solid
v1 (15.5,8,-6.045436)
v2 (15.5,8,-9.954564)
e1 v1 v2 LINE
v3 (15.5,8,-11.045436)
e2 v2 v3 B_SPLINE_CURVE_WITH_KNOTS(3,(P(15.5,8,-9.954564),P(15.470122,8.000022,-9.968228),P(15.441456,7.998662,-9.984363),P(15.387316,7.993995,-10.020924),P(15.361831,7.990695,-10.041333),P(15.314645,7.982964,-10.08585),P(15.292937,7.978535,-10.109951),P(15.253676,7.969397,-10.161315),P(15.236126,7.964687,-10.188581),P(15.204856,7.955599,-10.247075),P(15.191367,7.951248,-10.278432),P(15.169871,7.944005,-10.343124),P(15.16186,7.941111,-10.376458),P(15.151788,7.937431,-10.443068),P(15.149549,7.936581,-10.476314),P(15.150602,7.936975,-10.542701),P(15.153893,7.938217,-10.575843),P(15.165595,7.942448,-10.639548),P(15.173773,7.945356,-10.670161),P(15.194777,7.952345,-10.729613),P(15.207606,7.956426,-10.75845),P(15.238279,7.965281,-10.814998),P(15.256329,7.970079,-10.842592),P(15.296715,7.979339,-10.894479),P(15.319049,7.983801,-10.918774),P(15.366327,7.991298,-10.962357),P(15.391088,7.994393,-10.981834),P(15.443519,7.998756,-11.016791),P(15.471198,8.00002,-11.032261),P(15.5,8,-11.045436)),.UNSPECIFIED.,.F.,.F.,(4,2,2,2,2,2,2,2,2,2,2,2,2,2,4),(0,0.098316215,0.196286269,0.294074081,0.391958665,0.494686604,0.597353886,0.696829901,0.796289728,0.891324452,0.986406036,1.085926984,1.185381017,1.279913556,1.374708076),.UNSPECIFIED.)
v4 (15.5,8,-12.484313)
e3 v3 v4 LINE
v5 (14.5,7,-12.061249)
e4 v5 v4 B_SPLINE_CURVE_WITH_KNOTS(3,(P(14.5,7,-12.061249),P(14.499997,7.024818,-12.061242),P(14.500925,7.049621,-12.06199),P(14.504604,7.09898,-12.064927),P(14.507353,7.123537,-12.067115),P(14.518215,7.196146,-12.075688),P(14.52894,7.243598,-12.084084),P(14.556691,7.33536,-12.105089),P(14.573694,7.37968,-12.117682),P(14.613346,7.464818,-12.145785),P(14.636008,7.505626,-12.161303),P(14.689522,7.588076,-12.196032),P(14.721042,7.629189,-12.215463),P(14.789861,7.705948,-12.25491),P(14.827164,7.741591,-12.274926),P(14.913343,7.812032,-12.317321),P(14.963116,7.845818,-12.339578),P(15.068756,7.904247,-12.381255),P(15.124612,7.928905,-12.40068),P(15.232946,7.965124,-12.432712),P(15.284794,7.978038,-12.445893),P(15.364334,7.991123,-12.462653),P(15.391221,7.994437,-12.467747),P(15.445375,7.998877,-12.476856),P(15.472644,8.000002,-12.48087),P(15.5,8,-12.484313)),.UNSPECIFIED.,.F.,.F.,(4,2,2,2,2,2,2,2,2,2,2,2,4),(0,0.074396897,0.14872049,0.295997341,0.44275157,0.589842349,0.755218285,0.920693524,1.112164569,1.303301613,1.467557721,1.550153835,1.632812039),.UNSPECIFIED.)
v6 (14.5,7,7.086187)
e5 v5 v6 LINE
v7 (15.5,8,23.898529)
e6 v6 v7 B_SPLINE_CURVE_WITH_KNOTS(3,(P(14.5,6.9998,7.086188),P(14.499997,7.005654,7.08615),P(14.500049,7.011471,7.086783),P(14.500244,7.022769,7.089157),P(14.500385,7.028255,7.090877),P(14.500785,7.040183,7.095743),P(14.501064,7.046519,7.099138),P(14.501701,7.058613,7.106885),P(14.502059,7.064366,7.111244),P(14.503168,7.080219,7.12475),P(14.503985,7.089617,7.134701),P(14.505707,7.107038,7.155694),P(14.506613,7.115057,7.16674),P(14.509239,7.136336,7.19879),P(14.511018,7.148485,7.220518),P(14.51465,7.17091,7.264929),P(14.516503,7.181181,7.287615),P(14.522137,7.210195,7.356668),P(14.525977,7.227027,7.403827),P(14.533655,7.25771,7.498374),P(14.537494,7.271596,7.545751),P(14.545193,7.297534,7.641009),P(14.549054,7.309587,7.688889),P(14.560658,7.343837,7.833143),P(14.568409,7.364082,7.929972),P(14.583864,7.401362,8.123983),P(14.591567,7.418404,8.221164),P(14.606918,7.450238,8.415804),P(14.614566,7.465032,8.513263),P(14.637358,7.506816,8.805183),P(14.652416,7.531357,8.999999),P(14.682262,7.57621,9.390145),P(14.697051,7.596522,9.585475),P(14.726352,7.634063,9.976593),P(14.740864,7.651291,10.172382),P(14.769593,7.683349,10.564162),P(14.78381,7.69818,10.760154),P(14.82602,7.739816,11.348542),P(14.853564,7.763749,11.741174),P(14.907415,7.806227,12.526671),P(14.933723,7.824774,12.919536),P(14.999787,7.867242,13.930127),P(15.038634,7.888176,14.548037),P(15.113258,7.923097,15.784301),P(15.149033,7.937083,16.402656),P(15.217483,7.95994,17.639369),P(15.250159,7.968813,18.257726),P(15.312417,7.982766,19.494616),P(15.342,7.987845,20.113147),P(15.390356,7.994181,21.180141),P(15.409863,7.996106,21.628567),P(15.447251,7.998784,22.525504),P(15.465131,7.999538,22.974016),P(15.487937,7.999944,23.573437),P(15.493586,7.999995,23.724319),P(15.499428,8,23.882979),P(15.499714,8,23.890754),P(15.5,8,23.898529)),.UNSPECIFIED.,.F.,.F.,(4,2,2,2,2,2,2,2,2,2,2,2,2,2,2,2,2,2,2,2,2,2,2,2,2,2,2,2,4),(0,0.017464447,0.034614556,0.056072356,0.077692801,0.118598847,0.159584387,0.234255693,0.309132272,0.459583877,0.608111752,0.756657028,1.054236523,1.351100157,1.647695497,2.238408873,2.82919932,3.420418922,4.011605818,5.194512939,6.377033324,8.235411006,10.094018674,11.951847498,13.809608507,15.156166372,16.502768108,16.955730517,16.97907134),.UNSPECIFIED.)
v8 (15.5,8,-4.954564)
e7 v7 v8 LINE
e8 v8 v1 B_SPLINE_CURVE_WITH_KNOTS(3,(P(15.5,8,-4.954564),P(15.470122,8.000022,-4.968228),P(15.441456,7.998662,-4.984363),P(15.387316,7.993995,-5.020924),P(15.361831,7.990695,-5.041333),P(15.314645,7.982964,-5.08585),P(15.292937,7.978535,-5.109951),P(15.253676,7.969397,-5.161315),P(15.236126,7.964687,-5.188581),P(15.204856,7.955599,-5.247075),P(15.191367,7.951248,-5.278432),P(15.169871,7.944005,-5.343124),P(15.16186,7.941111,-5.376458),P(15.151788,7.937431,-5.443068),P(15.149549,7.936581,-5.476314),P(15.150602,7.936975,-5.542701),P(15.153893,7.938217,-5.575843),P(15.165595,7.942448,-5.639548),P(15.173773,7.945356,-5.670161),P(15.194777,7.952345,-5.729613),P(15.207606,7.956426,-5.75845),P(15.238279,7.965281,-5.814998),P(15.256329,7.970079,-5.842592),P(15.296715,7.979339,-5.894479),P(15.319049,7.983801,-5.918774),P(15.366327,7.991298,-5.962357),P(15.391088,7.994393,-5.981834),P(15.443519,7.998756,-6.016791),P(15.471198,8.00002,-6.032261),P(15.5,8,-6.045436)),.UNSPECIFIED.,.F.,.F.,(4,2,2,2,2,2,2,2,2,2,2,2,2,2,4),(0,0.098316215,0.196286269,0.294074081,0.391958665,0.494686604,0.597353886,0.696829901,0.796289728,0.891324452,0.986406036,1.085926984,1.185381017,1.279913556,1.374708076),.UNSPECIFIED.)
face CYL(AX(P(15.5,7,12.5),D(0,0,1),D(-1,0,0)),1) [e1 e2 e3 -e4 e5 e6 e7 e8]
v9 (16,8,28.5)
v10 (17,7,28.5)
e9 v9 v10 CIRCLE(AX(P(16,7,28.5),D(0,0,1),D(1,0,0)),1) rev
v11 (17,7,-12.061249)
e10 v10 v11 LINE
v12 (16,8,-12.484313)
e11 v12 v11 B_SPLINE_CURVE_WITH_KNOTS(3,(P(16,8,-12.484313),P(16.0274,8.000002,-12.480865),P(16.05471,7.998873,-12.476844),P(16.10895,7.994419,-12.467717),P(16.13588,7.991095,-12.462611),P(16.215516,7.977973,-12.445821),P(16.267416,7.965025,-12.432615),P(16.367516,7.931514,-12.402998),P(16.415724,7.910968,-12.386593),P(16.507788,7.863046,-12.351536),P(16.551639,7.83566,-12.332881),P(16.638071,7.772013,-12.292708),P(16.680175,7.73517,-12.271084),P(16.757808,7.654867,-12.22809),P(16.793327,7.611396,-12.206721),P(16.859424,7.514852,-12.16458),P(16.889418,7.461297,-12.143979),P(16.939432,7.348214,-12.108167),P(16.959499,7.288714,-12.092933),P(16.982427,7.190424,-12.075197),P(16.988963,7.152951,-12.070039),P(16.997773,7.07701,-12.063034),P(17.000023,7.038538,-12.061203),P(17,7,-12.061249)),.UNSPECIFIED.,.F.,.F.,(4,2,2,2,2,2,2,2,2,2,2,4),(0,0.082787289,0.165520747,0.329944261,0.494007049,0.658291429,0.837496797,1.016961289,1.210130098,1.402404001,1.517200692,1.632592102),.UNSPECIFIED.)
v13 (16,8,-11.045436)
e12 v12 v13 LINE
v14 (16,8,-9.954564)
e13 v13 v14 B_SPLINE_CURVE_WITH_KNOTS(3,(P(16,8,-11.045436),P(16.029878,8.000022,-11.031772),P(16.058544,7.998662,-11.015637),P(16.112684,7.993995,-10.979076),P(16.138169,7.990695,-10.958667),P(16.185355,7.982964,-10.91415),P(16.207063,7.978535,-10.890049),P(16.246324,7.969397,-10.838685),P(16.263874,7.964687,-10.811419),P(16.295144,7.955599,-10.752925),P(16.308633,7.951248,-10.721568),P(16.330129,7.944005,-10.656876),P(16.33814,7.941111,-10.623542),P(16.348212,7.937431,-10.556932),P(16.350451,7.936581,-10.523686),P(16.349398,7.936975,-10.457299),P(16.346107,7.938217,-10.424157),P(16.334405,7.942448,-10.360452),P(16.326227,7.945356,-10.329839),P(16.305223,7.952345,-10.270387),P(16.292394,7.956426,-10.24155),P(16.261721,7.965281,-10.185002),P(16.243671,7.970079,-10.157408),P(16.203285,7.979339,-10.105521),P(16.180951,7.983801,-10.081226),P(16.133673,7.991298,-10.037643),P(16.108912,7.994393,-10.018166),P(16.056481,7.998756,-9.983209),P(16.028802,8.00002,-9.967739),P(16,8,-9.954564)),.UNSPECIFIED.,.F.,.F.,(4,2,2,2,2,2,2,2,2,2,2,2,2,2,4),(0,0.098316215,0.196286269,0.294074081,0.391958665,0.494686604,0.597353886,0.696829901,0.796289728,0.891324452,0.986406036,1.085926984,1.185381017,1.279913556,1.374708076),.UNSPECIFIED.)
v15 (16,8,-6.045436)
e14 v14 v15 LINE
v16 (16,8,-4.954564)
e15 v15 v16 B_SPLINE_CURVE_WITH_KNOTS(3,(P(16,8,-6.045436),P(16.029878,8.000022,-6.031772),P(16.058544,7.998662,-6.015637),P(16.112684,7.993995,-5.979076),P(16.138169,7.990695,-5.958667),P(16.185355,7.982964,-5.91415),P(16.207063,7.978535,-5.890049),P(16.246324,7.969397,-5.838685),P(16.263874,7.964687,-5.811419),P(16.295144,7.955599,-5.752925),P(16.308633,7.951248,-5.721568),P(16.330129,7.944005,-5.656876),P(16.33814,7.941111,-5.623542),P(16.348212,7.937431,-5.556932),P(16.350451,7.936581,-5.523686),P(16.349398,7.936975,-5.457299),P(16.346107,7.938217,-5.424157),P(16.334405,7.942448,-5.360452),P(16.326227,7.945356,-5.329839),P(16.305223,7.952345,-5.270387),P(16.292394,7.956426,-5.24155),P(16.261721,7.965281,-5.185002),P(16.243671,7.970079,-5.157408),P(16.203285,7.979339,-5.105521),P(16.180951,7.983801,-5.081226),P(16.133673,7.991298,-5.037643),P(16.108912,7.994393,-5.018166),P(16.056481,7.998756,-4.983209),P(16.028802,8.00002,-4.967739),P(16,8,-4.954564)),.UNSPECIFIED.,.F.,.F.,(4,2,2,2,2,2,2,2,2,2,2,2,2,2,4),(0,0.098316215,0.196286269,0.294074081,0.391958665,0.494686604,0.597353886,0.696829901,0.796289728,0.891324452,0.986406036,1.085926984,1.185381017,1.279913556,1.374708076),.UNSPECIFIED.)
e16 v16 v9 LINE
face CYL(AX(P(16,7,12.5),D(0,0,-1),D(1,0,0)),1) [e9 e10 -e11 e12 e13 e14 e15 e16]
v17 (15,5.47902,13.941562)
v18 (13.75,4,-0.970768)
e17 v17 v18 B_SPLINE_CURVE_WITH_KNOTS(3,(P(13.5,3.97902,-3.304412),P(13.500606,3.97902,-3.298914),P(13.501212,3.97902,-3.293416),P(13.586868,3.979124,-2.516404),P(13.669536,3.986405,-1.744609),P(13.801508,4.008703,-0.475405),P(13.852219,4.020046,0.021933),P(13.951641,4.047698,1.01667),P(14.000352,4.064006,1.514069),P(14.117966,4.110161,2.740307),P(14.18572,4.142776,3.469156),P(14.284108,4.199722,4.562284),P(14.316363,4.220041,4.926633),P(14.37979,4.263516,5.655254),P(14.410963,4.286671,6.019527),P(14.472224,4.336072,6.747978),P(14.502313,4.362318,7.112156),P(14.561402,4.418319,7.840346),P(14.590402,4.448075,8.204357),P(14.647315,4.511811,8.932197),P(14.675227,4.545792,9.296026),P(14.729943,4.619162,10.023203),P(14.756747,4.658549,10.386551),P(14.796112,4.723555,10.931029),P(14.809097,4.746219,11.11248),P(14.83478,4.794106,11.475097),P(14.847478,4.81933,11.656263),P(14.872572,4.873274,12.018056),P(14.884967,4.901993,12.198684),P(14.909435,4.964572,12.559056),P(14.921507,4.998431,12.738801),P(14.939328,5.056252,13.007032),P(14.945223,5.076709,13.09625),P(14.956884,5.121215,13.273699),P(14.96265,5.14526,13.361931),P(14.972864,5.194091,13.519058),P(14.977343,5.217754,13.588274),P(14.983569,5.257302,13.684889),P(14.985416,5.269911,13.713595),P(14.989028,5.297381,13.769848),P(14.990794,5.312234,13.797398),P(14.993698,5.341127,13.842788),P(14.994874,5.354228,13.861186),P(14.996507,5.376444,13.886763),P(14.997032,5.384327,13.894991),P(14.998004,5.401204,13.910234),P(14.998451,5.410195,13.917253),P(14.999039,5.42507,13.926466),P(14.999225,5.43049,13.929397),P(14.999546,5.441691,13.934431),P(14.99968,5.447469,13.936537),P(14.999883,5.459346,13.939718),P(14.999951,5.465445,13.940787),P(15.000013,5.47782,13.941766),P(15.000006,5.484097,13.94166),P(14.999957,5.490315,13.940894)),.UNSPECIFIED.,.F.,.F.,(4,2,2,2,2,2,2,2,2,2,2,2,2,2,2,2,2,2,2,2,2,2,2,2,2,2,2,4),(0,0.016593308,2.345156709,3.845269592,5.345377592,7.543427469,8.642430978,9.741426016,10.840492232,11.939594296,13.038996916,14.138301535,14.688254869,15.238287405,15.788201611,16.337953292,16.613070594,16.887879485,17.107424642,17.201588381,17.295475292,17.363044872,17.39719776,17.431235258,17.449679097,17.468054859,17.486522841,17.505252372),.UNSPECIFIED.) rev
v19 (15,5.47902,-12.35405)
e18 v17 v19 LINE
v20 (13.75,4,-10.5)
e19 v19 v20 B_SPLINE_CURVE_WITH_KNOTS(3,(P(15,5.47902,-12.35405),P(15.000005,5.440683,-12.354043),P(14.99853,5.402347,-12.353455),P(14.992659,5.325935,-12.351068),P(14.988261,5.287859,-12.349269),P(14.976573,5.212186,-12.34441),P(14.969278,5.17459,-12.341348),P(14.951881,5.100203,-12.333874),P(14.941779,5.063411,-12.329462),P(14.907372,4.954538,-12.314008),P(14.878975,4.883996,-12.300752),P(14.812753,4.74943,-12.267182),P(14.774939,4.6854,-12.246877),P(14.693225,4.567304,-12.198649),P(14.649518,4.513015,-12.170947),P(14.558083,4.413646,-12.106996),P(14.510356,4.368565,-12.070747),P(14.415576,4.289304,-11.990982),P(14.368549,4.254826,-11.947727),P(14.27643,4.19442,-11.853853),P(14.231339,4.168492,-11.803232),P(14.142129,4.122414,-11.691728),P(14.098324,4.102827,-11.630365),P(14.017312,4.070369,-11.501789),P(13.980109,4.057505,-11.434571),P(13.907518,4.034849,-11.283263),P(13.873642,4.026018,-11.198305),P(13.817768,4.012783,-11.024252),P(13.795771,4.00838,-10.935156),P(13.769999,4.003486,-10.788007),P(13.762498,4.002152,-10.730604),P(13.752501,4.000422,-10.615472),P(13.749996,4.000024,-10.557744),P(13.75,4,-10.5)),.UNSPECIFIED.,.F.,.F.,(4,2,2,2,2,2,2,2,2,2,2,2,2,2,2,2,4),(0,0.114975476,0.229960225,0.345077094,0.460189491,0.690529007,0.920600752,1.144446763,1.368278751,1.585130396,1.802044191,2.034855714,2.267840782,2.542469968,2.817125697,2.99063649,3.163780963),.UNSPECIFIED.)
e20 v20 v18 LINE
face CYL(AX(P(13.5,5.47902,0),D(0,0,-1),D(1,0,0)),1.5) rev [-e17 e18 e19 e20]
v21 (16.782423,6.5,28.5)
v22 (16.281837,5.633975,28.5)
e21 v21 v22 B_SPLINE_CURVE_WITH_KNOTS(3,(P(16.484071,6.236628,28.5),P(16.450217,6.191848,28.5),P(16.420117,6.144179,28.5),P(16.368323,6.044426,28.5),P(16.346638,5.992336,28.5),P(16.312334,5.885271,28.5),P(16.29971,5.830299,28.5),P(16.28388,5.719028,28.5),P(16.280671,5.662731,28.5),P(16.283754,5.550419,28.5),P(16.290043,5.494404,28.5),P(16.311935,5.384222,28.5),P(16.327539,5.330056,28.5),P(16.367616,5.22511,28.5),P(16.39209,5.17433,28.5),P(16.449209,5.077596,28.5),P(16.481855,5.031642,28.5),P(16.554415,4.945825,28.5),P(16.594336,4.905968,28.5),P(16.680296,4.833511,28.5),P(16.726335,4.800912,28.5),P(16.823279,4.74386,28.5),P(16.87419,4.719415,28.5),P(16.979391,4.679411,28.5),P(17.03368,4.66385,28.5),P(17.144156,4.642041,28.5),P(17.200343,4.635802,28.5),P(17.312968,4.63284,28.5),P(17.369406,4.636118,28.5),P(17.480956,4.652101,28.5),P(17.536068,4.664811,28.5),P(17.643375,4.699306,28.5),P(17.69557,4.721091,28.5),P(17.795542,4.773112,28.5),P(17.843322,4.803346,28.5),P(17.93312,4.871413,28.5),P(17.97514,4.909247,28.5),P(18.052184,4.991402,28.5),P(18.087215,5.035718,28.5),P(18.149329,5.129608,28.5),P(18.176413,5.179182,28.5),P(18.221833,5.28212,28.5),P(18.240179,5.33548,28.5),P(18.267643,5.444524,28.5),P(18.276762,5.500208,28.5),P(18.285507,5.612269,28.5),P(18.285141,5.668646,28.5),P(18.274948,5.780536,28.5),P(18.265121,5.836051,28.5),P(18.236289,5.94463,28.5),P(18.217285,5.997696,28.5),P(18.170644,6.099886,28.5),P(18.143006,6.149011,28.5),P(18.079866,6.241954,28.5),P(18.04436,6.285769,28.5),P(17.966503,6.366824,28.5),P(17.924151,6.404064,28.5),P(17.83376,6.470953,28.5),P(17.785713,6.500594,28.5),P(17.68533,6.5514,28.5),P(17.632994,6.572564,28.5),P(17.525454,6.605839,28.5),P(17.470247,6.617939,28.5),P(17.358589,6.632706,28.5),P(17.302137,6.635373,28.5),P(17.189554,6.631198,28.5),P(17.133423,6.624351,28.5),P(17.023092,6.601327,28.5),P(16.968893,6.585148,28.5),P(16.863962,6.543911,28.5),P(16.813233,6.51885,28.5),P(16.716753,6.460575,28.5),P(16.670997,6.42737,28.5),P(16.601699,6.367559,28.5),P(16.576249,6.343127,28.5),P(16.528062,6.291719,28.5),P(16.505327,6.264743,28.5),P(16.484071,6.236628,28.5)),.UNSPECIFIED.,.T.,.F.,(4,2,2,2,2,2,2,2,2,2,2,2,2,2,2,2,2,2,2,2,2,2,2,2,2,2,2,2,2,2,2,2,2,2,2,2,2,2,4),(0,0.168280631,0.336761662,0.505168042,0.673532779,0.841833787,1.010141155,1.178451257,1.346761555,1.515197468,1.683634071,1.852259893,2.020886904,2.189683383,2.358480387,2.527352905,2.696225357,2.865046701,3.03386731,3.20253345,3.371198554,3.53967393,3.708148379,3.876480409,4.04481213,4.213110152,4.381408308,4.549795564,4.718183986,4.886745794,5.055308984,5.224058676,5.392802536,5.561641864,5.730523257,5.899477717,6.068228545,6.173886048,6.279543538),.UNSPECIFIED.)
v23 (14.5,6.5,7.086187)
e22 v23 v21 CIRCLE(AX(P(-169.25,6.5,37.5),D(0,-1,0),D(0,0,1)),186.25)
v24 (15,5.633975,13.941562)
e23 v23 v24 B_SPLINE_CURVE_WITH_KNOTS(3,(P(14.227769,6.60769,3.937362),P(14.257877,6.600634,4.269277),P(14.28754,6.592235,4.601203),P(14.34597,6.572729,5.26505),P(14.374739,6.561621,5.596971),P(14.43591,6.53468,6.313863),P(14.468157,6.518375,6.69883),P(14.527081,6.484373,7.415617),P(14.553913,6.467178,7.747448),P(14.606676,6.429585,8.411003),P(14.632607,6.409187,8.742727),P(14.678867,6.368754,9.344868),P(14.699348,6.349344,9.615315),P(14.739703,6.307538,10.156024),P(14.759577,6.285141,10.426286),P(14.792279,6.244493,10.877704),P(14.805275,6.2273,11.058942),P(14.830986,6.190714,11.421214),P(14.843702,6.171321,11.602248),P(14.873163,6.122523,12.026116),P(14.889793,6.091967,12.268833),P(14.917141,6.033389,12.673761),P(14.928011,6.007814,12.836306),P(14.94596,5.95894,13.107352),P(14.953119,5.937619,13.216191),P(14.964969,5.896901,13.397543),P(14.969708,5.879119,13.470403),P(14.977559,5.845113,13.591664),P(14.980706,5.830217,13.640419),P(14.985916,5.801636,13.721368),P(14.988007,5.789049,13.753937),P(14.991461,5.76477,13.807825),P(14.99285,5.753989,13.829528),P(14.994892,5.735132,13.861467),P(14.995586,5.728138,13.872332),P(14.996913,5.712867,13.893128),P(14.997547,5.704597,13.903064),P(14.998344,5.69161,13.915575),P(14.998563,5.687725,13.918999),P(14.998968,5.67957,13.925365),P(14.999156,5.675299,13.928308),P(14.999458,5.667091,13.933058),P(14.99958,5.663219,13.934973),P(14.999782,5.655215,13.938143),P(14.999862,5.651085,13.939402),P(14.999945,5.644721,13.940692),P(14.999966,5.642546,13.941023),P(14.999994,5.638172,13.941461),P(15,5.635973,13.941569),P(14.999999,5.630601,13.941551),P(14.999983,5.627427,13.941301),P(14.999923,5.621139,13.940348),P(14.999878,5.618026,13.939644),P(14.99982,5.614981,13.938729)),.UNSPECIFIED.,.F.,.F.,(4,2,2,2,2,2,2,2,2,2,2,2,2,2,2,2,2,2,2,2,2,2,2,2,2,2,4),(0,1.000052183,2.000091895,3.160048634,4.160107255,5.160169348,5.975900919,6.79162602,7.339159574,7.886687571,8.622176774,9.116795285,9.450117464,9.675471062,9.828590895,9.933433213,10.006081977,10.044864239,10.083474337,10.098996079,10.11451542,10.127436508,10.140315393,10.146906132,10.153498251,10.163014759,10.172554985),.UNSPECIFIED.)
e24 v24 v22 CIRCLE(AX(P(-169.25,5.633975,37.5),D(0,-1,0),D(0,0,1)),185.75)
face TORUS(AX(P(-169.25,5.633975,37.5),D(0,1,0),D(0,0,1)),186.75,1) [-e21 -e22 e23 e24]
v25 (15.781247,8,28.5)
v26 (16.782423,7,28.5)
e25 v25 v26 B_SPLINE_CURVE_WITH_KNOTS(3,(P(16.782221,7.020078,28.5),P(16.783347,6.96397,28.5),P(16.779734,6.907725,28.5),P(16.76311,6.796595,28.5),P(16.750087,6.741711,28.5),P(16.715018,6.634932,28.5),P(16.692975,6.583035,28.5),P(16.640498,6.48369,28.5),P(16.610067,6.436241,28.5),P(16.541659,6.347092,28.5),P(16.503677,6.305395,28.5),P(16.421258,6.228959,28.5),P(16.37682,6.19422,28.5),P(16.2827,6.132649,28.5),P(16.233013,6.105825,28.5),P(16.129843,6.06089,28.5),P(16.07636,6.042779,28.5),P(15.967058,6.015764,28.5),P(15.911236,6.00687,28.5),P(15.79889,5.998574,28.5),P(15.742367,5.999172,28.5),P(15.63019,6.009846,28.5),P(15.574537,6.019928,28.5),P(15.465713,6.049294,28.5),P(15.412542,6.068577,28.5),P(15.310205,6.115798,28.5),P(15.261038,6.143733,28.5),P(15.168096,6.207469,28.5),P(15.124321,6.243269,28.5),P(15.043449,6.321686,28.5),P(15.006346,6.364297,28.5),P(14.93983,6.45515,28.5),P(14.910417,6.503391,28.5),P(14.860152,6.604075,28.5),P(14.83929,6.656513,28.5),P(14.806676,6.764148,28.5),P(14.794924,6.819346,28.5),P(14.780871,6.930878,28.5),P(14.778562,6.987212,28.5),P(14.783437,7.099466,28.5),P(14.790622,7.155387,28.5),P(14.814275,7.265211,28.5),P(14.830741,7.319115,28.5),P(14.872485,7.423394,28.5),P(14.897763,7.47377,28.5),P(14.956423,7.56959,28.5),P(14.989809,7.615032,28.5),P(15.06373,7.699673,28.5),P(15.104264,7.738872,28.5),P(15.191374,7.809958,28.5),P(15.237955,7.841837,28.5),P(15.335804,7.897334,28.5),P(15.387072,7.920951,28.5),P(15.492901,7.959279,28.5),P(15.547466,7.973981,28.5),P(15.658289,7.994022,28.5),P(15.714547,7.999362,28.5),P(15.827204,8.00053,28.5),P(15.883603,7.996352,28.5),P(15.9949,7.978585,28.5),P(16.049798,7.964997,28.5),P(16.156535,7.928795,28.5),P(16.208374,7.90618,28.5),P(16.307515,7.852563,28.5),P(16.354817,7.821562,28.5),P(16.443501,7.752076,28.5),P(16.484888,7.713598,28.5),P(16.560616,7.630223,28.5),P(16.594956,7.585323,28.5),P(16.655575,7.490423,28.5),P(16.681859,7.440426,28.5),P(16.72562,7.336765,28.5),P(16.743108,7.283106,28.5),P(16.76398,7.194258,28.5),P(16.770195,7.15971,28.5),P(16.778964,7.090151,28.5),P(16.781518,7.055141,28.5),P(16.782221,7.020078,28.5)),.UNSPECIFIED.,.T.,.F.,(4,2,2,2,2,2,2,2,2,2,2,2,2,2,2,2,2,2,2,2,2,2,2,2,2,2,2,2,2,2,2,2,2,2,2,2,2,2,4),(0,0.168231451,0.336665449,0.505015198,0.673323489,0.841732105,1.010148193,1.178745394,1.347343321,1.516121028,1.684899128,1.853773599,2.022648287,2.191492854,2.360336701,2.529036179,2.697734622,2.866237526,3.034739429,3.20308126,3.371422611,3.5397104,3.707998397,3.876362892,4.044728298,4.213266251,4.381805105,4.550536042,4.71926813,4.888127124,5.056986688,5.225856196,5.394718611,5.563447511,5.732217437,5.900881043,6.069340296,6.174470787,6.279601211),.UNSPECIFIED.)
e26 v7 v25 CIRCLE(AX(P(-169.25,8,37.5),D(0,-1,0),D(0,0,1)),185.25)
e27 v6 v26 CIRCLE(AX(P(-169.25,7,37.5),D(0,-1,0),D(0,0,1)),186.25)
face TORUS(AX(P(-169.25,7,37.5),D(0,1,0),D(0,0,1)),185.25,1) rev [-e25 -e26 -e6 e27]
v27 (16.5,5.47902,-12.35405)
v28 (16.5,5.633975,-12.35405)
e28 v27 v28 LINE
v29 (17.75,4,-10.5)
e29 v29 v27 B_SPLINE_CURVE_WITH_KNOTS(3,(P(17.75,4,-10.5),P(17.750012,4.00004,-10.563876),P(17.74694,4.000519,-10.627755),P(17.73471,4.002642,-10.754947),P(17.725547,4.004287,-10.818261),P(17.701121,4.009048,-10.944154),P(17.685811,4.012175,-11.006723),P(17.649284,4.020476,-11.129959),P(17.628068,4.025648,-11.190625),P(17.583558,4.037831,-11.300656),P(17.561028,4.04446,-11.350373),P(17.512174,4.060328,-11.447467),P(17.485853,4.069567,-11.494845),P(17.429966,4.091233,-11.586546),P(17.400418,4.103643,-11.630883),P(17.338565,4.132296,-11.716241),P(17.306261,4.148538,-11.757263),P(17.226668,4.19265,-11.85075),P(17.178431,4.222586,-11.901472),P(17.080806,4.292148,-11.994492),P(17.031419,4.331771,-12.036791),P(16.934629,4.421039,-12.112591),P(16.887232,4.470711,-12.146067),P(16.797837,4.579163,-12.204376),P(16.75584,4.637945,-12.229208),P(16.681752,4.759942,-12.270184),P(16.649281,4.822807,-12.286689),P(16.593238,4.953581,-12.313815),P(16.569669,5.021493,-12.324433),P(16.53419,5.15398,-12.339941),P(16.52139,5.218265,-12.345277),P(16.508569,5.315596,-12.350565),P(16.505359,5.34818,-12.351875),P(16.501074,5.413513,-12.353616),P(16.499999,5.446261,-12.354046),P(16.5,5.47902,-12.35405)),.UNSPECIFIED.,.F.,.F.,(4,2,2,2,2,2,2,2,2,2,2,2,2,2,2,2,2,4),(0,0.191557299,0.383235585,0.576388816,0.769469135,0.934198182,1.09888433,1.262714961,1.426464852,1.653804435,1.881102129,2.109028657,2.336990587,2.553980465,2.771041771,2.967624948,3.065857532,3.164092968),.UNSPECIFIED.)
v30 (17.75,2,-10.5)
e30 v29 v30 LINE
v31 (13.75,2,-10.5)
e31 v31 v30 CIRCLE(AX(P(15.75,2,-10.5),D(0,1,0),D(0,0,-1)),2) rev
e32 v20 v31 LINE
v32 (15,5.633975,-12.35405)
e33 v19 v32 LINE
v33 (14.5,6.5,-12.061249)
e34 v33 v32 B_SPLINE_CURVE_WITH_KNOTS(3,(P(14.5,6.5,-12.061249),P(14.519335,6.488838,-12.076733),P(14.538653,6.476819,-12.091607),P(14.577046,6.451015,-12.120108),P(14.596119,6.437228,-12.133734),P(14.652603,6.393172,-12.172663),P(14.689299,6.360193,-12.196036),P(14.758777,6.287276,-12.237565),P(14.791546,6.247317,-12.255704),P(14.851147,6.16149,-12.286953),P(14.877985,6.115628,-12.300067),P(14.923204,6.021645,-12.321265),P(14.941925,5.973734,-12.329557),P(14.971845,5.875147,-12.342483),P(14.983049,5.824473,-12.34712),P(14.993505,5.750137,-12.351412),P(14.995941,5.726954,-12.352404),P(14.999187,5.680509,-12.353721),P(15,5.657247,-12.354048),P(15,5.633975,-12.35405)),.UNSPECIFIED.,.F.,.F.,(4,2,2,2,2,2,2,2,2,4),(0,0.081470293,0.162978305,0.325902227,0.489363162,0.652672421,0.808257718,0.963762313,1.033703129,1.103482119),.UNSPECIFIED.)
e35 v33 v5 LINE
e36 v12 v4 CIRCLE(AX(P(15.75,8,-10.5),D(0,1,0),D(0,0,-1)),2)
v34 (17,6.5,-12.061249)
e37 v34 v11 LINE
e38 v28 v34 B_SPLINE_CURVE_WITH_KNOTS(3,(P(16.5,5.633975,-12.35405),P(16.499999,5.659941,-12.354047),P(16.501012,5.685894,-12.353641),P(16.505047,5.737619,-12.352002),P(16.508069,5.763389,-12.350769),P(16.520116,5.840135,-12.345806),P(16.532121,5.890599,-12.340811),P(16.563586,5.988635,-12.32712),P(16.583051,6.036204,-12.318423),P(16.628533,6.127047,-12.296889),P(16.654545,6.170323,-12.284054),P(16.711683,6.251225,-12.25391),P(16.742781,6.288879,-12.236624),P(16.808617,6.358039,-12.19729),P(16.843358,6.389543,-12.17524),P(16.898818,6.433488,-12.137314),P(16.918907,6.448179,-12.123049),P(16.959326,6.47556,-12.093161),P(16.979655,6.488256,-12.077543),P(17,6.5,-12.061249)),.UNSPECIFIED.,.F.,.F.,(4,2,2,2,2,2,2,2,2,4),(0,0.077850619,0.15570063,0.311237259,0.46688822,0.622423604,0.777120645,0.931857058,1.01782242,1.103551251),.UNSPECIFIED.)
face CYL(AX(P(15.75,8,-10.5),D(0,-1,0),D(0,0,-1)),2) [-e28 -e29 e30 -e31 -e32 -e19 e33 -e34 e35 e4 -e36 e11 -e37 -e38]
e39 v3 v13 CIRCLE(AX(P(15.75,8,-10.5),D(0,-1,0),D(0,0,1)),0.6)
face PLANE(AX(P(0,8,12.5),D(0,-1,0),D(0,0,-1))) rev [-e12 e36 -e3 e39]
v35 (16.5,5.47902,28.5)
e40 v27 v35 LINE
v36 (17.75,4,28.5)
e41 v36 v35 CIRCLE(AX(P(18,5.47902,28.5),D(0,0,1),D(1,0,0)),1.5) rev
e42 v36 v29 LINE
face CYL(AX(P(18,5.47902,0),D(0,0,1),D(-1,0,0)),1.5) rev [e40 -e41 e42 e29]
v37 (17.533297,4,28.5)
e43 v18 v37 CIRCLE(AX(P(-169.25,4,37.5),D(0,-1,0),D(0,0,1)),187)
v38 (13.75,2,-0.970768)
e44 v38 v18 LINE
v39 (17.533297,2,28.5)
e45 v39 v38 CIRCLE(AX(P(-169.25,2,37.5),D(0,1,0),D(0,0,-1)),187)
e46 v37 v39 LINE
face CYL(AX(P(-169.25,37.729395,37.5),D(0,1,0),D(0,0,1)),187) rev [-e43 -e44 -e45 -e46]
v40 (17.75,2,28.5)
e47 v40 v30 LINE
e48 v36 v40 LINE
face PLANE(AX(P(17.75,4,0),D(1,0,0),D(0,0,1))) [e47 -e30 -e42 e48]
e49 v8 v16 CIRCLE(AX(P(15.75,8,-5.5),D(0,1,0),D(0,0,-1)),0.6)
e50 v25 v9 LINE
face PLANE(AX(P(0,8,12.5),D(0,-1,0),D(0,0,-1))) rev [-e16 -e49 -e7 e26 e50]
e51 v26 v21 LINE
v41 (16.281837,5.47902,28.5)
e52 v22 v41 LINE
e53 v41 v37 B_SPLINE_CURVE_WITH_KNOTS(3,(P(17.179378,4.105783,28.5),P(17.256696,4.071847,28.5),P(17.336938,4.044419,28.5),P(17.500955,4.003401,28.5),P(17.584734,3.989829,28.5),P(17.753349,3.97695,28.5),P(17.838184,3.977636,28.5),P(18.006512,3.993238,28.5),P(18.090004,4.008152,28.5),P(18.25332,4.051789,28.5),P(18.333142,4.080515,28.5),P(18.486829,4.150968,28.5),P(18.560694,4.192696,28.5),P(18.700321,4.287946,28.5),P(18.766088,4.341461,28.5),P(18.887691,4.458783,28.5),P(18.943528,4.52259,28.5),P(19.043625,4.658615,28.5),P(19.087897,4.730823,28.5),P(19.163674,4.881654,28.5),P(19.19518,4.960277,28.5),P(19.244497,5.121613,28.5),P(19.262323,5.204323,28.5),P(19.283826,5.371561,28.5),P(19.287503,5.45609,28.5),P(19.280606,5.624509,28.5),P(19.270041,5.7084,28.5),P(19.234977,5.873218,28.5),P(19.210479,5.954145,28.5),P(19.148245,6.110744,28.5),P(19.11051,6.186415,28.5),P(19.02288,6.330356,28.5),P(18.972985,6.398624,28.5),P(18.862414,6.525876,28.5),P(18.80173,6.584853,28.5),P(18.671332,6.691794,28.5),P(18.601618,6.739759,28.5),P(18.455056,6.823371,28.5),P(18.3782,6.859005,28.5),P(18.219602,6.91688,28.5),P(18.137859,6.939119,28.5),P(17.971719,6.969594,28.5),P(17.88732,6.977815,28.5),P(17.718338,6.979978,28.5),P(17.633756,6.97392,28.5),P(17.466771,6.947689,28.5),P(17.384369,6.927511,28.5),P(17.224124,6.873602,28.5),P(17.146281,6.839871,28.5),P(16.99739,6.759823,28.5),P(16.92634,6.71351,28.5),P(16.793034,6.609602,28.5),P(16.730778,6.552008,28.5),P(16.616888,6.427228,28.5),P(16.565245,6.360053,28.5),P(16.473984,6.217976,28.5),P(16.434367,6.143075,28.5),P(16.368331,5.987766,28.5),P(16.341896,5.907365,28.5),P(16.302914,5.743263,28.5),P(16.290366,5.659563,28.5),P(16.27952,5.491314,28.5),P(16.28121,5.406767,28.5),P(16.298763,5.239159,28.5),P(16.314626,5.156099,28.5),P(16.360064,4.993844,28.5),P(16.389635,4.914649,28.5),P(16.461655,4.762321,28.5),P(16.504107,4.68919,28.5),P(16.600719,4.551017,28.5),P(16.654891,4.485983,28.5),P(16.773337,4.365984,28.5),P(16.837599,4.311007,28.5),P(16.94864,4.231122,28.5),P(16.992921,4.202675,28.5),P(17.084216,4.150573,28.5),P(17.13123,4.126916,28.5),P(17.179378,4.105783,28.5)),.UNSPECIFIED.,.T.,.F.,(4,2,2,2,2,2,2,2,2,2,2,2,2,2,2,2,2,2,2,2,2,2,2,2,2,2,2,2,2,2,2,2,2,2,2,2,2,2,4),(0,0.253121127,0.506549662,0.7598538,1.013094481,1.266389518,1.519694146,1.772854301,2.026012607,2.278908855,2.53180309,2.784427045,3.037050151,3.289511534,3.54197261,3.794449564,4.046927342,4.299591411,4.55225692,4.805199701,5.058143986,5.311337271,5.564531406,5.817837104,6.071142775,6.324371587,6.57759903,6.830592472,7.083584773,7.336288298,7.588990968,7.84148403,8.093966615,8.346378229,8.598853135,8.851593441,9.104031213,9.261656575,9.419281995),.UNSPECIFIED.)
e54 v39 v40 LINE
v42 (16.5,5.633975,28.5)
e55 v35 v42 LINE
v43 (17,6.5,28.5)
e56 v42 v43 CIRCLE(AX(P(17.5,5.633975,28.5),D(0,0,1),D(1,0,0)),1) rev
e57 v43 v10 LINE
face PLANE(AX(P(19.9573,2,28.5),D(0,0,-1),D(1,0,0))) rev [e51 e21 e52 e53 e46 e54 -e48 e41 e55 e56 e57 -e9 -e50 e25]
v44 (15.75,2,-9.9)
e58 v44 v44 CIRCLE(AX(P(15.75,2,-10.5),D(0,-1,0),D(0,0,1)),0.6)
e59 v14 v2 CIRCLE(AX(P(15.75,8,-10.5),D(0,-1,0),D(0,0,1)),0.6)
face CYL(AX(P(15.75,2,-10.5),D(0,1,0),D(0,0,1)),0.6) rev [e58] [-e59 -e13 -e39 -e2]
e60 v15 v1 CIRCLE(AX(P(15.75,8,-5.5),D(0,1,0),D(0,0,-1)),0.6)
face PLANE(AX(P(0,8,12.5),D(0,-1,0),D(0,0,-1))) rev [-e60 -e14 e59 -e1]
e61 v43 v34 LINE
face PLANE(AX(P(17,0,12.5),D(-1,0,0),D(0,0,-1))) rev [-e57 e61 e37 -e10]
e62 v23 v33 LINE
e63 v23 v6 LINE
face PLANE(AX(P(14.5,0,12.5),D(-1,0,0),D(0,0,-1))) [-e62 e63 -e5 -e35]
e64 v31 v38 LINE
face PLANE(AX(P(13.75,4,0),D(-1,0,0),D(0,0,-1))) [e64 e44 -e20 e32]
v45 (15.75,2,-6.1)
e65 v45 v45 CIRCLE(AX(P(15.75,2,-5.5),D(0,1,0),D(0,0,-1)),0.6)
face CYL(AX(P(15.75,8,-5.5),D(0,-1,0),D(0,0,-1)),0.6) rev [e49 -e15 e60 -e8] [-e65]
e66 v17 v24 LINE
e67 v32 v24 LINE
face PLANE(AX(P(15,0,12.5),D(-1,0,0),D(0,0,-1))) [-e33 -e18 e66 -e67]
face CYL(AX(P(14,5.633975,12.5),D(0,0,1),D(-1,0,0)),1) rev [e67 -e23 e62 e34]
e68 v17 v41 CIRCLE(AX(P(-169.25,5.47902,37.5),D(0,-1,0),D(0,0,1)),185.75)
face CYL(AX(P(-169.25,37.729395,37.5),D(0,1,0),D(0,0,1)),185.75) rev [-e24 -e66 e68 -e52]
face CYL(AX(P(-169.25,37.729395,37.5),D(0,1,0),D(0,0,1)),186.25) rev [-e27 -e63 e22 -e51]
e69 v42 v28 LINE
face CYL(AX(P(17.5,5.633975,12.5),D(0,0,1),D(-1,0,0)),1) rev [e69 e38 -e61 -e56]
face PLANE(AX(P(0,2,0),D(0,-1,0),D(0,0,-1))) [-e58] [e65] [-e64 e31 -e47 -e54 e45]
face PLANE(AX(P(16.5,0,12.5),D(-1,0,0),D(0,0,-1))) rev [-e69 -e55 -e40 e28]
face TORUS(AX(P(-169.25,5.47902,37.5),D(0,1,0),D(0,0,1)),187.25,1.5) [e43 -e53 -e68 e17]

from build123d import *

# Parameters (mm, degrees)
SKETCH_1_W          = 4
SKETCH_1_H          = 17
SKETCH_1_H_2        = 8
EXTRUDE_1_DEPTH     = 4
SKETCH_1_7_W        = 44.5
SKETCH_1_7_H        = 8
EXTRUDE_2_DEPTH     = 3.5
SKETCH_2_W          = 18.5
SKETCH_2_H          = 1.5
CUT_EXTRUDE_1_DEPTH = 34.705526253
SKETCH_2_3_W        = 2.5
SKETCH_2_3_H        = 1.5
EXTRUDE_4_DEPTH     = 25
FILLET_1_R          = 1
FILLET_2_R          = 1.5
FILLET_3_R          = 1
SKETCH_10_W         = 4.5
SKETCH_10_H         = 8
SKETCH_10_W_2       = 36
SKETCH_10_H_2       = 50
CUT_EXTRUDE_2_DEPTH = 45.331845213
CUT_EXTRUDE_3_DEPTH = 43.252958476
SKETCH_12_W         = 4
SKETCH_12_H         = 50
CUT_EXTRUDE_4_DEPTH = 2
SKETCH_13_R         = 0.6
CUT_EXTRUDE_5_DEPTH = 42.920311452
SKETCH_24_R         = 0.6
CUT_EXTRUDE_6_DEPTH = 42.920311452
SKETCH_25_W         = 9.588346595
SKETCH_25_H         = 3.3
CUT_EXTRUDE_7_DEPTH = 42.920311452
SKETCH_26_W         = 7.846978632
SKETCH_26_H         = 7.676354821
CUT_EXTRUDE_8_DEPTH = 39.99618586
SKETCH_27_W         = 71.858666529
SKETCH_27_H         = 35.216616035
CUT_EXTRUDE_9_DEPTH = 35.515395273


with BuildPart() as part:
    # 草图1 → 凸台-拉伸1 (new body)
    with BuildSketch(Plane(origin=(0, 0, 0), x_dir=(1, 0, 0), z_dir=(0, 1, 0))):
        with Locations((-15.75, -4)):
            Rectangle(SKETCH_1_W, SKETCH_1_H)
        with Locations((15.75, -4)):
            Rectangle(SKETCH_1_W, SKETCH_1_H)
        with Locations((15.75, 8.5)):
            Rectangle(SKETCH_1_W, SKETCH_1_H_2)
        with Locations((-15.75, 8.5)):
            Rectangle(SKETCH_1_W, SKETCH_1_H_2)
    extrude(amount=EXTRUDE_1_DEPTH)

    # 草图1<7> → 凸台-拉伸2 (add)
    with BuildSketch(Plane(origin=(0, 0, 0), x_dir=(1, 0, 0), z_dir=(0, 1, 0))):
        with Locations((0, 8.5)):
            Rectangle(SKETCH_1_7_W, SKETCH_1_7_H)
    extrude(amount=EXTRUDE_2_DEPTH)

    # 草图2 → 切除-拉伸1 (cut, through all)
    with BuildSketch(Plane(origin=(0, 0, -12.5), x_dir=(-1, 0, 0), z_dir=(0, 0, -1))):
        with Locations((0, 2.75)):
            Rectangle(SKETCH_2_W, SKETCH_2_H)
        Polygon((13.25, 3.5), (9.25, 3.5), (9.25, 2), align=None)
        Polygon((-9.25, 3.5), (-13.25, 3.5), (-9.25, 2), align=None)
        Polygon((-22.25, 3.5), (-22.25, 2), (-18.25, 3.5), align=None)
        Polygon((22.25, 3.5), (18.25, 3.5), (22.25, 2), align=None)
    extrude(amount=-CUT_EXTRUDE_1_DEPTH, mode=Mode.SUBTRACT)

    # 草图2<3> → 凸台-拉伸4 (add, through all)
    with BuildSketch(Plane(origin=(0, 0, -12.5), x_dir=(-1, 0, 0), z_dir=(0, 0, -1))):
        with Locations((-15.75, 7.25)):
            Rectangle(SKETCH_2_3_W, SKETCH_2_3_H)
        Polygon((-15, 6.5), (-16.5, 6.5), (-16.5, 4), (-15.75, 4), (-15, 4), align=None)
        with Locations((15.75, 7.25)):
            Rectangle(SKETCH_2_3_W, SKETCH_2_3_H)
        Polygon((16.5, 6.5), (15, 6.5), (15, 4), (15.75, 4), (16.5, 4), align=None)
    extrude(amount=-EXTRUDE_4_DEPTH)

    # 圆角1
    # the kernel refuses this fillet: 1 mm, written as the material it adds along each edge
    with BuildSketch(Plane(origin=(-16.5, 6.5, -12.5), x_dir=(-1, 0, 0), z_dir=(0, 0, 1)), Plane(origin=(15, 6.5, -12.5), x_dir=(-1, 0, 0), z_dir=(0, 0, 1))) as fillet_1_piece_1:
        with BuildLine():
            CenterArc((1, 0.866025404), FILLET_1_R, 180, 60)
            Line((0, 0.866025404), (-0.02, 0.866025404))
            Line((-0.02, 0.866025404), (-0.02, 0))
            Line((-0.02, 0), (0, -0.02))
            ThreePointArc((0, -0.02), (0.25, -0.02), (0.49, -0.017320508))
            Line((0.49, -0.017320508), (0.5, 0))
        make_face()
    extrude(amount=25)
    with BuildSketch(Plane(origin=(-15, 6.5, -12.5), x_dir=(0, -1, 0), z_dir=(0, 0, 1)), Plane(origin=(16.5, 6.5, -12.5), x_dir=(0, -1, 0), z_dir=(0, 0, 1))) as fillet_1_piece_2:
        with BuildLine():
            CenterArc((0.866025404, 1), FILLET_1_R, 210, 60)
            Line((0, 0.5), (-0.017320508, 0.49))
            ThreePointArc((-0.017320508, 0.49), (-0.02, 0.25), (-0.02, 0))
            Line((-0.02, 0), (0, -0.02))
            Line((0, -0.02), (0.866025404, -0.02))
            Line((0.866025404, -0.02), (0.866025404, 0))
        make_face()
    extrude(amount=25)

    # 圆角2
    # the kernel refuses this fillet: 1.5 mm, written as the material it adds along each edge
    with BuildSketch(Plane(origin=(16.5, 4, -12.5), x_dir=(1, 0, 0), z_dir=(0, 0, 1))) as fillet_2_piece_1:
        with BuildLine():
            CenterArc((1.5, 1.479019946), FILLET_2_R, 180, 80.405931773)
            Line((0, 1.479019946), (-0.03, 1.479019946))
            Line((-0.03, 1.479019946), (-0.03, 0))
            Line((-0.03, 0), (0, -0.03))
            ThreePointArc((0, -0.03), (0.625, -0.03), (1.245, -0.029580399))
            Line((1.245, -0.029580399), (1.25, 0))
        make_face()
    extrude(amount=25)
    with BuildSketch(Plane(origin=(15, 4, -12.5), x_dir=(0, 1, 0), z_dir=(0, 0, 1)), Plane(origin=(-16.5, 4, -12.5), x_dir=(0, 1, 0), z_dir=(0, 0, 1))) as fillet_2_piece_2:
        with BuildLine():
            CenterArc((1.479019946, 1.5), FILLET_2_R, 189.594068227, 80.405931773)
            Line((0, 1.25), (-0.029580399, 1.245))
            ThreePointArc((-0.029580399, 1.245), (-0.03, 0.625), (-0.03, 0))
            Line((-0.03, 0), (0, -0.03))
            Line((0, -0.03), (1.479019946, -0.03))
            Line((1.479019946, -0.03), (1.479019946, 0))
        make_face()
    extrude(amount=25)
    with BuildSketch(Plane(origin=(-15, 4, -12.5), x_dir=(0, 1, 0), z_dir=(0, 0, 1))) as fillet_2_piece_3:
        with BuildLine():
            CenterArc((1.479019946, -1.5), FILLET_2_R, 90, 80.405931773)
            Line((0, -1.25), (-0.029580399, -1.245))
            ThreePointArc((-0.029580399, -1.245), (-0.03, -0.625), (-0.03, 0))
            Line((-0.03, 0), (0, 0.03))
            Line((0, 0.03), (1.479019946, 0.03))
            Line((1.479019946, 0.03), (1.479019946, 0))
        make_face()
    extrude(amount=25)

    # 圆角3
    fillet_3_edges = [part.edges().sort_by_distance(p)[0] for p in [
        (14.5, 8, 0),
        (17, 8, 0),
        (-17, 8, 0),
        (-14.5, 8, 0),
    ]]
    fillet(fillet_3_edges, radius=FILLET_3_R)

    # 镜向2: part across plane


with BuildPart() as part_1:
    add(part.part)
    add(part.part.mirror(Plane(origin=(0, 4, 12.5), x_dir=(1, 0, 0), z_dir=(0, 0, -1))))

    # 草图10 → 切除-拉伸2 (cut, through all)
    with BuildSketch(Plane.XZ):
        with Locations((-20, 33.5)):
            Rectangle(SKETCH_10_W, SKETCH_10_H)
        with Locations((-20, -8.5)):
            Rectangle(SKETCH_10_W, SKETCH_10_H)
        with Locations((4.25, 12.5)):
            Rectangle(SKETCH_10_W_2, SKETCH_10_H_2)
    extrude(amount=-CUT_EXTRUDE_2_DEPTH, mode=Mode.SUBTRACT)

    # 草图11 → 切除-拉伸3 (cut, through all)
    with BuildSketch(Plane(origin=(0, 0, 0), x_dir=(-1, 0, 0), z_dir=(0, -1, 0))):
        with BuildLine():
            ThreePointArc((15.75, 12.5), (17.164213562, 11.914213562), (17.75, 10.5))
            Line((17.75, 10.5), (17.75, 12.5))
            Line((17.75, 12.5), (15.75, 12.5))
        make_face()
        with BuildLine():
            ThreePointArc((13.75, 10.5), (14.335786438, 11.914213562), (15.75, 12.5))
            Line((15.75, 12.5), (13.75, 12.5))
            Line((13.75, 12.5), (13.75, 10.5))
        make_face()
    extrude(amount=-CUT_EXTRUDE_3_DEPTH, mode=Mode.SUBTRACT)

    # 草图12 → 切除-拉伸4 (cut)
    with BuildSketch(Plane.XZ):
        with Locations((-15.75, 12.5)):
            Rectangle(SKETCH_12_W, SKETCH_12_H)
    extrude(amount=-CUT_EXTRUDE_4_DEPTH, mode=Mode.SUBTRACT)

    # 草图13 → 切除-拉伸5 (cut, through all)
    with BuildSketch(Plane(origin=(0, 8, 0), x_dir=(1, 0, 0), z_dir=(0, 1, 0))):
        with Locations(Location((-15.75, 10.5, 0), (0, 0, 270))):
            Circle(SKETCH_13_R)
    extrude(amount=-CUT_EXTRUDE_5_DEPTH, mode=Mode.SUBTRACT)

    # 草图16 → 切除-旋转1 (revolve, cut)
    with BuildSketch(Plane.XY.offset(37.5)):
        with BuildLine():
            Line((-17.75, 0), (-13.75, 0))
            Line((-13.75, 0), (-13.75, 4))
            ThreePointArc((-13.75, 4), (-14.645643924, 4.510774109), (-15, 5.479019946))
            Line((-15, 5.479019946), (-15, 5.633974596))
            ThreePointArc((-15, 5.633974596), (-14.866025404, 6.133974596), (-14.5, 6.5))
            Line((-14.5, 6.5), (-14.5, 7))
            ThreePointArc((-14.5, 7), (-14.792893219, 7.707106781), (-15.5, 8))
            Line((-15.5, 8), (-16, 8))
            ThreePointArc((-16, 8), (-16.707106781, 7.707106781), (-17, 7))
            Line((-17, 7), (-17, 6.5))
            ThreePointArc((-17, 6.5), (-16.633974596, 6.133974596), (-16.5, 5.633974596))
            Line((-16.5, 5.633974596), (-16.5, 5.479019946))
            ThreePointArc((-16.5, 5.479019946), (-16.854356076, 4.510774109), (-17.75, 4))
            Line((-17.75, 4), (-17.75, 0))
        make_face()
    revolve(axis=Axis((169.25, 37.729395322, 37.5), (0, -1, 0)), mode=Mode.SUBTRACT)

    # 草图24 → 切除-拉伸6 (cut, through all)
    with BuildSketch(Plane(origin=(0, 2, 0), x_dir=(-1, 0, 0), z_dir=(0, -1, 0))):
        with Locations(Location((15.75, 5.5, 0), (0, 0, 90))):
            Circle(SKETCH_24_R)
    extrude(amount=-CUT_EXTRUDE_6_DEPTH, mode=Mode.SUBTRACT)

    # 草图25 → 切除-拉伸7 (cut, through all)
    with BuildSketch(Plane(origin=(0, 8, 0), x_dir=(1, 0, 0), z_dir=(0, 1, 0))):
        with Locations((-13.334902889, -35.85)):
            Rectangle(SKETCH_25_W, SKETCH_25_H)
    extrude(amount=-CUT_EXTRUDE_7_DEPTH, mode=Mode.SUBTRACT)

    # 草图26 → 切除-拉伸8 (cut, through all)
    with BuildSketch(Plane(origin=(0, 8, 0), x_dir=(1, 0, 0), z_dir=(0, 1, 0))):
        with Locations((-16.033810668, -32.338177411)):
            Rectangle(SKETCH_26_W, SKETCH_26_H)
    extrude(amount=-CUT_EXTRUDE_8_DEPTH, mode=Mode.SUBTRACT)


with BuildPart() as body_2:
    # 镜向3: mirrored copy
    add(part_1.part.mirror(Plane(origin=(0, 0, 0), x_dir=(0, 0, 1), z_dir=(1, 0, 0))))


with BuildPart() as part_2:
    add(part_1.part)

    # 草图27 → 切除-拉伸9 (cut, through all)
    with BuildSketch(Plane(origin=(0, 0, 0), x_dir=(0, 0, -1), z_dir=(1, 0, 0))):
        with Locations((-17.475525281, 10.465734061)):
            Rectangle(SKETCH_27_W, SKETCH_27_H)
    extrude(amount=-CUT_EXTRUDE_9_DEPTH, mode=Mode.SUBTRACT)


solid = body_2.part
